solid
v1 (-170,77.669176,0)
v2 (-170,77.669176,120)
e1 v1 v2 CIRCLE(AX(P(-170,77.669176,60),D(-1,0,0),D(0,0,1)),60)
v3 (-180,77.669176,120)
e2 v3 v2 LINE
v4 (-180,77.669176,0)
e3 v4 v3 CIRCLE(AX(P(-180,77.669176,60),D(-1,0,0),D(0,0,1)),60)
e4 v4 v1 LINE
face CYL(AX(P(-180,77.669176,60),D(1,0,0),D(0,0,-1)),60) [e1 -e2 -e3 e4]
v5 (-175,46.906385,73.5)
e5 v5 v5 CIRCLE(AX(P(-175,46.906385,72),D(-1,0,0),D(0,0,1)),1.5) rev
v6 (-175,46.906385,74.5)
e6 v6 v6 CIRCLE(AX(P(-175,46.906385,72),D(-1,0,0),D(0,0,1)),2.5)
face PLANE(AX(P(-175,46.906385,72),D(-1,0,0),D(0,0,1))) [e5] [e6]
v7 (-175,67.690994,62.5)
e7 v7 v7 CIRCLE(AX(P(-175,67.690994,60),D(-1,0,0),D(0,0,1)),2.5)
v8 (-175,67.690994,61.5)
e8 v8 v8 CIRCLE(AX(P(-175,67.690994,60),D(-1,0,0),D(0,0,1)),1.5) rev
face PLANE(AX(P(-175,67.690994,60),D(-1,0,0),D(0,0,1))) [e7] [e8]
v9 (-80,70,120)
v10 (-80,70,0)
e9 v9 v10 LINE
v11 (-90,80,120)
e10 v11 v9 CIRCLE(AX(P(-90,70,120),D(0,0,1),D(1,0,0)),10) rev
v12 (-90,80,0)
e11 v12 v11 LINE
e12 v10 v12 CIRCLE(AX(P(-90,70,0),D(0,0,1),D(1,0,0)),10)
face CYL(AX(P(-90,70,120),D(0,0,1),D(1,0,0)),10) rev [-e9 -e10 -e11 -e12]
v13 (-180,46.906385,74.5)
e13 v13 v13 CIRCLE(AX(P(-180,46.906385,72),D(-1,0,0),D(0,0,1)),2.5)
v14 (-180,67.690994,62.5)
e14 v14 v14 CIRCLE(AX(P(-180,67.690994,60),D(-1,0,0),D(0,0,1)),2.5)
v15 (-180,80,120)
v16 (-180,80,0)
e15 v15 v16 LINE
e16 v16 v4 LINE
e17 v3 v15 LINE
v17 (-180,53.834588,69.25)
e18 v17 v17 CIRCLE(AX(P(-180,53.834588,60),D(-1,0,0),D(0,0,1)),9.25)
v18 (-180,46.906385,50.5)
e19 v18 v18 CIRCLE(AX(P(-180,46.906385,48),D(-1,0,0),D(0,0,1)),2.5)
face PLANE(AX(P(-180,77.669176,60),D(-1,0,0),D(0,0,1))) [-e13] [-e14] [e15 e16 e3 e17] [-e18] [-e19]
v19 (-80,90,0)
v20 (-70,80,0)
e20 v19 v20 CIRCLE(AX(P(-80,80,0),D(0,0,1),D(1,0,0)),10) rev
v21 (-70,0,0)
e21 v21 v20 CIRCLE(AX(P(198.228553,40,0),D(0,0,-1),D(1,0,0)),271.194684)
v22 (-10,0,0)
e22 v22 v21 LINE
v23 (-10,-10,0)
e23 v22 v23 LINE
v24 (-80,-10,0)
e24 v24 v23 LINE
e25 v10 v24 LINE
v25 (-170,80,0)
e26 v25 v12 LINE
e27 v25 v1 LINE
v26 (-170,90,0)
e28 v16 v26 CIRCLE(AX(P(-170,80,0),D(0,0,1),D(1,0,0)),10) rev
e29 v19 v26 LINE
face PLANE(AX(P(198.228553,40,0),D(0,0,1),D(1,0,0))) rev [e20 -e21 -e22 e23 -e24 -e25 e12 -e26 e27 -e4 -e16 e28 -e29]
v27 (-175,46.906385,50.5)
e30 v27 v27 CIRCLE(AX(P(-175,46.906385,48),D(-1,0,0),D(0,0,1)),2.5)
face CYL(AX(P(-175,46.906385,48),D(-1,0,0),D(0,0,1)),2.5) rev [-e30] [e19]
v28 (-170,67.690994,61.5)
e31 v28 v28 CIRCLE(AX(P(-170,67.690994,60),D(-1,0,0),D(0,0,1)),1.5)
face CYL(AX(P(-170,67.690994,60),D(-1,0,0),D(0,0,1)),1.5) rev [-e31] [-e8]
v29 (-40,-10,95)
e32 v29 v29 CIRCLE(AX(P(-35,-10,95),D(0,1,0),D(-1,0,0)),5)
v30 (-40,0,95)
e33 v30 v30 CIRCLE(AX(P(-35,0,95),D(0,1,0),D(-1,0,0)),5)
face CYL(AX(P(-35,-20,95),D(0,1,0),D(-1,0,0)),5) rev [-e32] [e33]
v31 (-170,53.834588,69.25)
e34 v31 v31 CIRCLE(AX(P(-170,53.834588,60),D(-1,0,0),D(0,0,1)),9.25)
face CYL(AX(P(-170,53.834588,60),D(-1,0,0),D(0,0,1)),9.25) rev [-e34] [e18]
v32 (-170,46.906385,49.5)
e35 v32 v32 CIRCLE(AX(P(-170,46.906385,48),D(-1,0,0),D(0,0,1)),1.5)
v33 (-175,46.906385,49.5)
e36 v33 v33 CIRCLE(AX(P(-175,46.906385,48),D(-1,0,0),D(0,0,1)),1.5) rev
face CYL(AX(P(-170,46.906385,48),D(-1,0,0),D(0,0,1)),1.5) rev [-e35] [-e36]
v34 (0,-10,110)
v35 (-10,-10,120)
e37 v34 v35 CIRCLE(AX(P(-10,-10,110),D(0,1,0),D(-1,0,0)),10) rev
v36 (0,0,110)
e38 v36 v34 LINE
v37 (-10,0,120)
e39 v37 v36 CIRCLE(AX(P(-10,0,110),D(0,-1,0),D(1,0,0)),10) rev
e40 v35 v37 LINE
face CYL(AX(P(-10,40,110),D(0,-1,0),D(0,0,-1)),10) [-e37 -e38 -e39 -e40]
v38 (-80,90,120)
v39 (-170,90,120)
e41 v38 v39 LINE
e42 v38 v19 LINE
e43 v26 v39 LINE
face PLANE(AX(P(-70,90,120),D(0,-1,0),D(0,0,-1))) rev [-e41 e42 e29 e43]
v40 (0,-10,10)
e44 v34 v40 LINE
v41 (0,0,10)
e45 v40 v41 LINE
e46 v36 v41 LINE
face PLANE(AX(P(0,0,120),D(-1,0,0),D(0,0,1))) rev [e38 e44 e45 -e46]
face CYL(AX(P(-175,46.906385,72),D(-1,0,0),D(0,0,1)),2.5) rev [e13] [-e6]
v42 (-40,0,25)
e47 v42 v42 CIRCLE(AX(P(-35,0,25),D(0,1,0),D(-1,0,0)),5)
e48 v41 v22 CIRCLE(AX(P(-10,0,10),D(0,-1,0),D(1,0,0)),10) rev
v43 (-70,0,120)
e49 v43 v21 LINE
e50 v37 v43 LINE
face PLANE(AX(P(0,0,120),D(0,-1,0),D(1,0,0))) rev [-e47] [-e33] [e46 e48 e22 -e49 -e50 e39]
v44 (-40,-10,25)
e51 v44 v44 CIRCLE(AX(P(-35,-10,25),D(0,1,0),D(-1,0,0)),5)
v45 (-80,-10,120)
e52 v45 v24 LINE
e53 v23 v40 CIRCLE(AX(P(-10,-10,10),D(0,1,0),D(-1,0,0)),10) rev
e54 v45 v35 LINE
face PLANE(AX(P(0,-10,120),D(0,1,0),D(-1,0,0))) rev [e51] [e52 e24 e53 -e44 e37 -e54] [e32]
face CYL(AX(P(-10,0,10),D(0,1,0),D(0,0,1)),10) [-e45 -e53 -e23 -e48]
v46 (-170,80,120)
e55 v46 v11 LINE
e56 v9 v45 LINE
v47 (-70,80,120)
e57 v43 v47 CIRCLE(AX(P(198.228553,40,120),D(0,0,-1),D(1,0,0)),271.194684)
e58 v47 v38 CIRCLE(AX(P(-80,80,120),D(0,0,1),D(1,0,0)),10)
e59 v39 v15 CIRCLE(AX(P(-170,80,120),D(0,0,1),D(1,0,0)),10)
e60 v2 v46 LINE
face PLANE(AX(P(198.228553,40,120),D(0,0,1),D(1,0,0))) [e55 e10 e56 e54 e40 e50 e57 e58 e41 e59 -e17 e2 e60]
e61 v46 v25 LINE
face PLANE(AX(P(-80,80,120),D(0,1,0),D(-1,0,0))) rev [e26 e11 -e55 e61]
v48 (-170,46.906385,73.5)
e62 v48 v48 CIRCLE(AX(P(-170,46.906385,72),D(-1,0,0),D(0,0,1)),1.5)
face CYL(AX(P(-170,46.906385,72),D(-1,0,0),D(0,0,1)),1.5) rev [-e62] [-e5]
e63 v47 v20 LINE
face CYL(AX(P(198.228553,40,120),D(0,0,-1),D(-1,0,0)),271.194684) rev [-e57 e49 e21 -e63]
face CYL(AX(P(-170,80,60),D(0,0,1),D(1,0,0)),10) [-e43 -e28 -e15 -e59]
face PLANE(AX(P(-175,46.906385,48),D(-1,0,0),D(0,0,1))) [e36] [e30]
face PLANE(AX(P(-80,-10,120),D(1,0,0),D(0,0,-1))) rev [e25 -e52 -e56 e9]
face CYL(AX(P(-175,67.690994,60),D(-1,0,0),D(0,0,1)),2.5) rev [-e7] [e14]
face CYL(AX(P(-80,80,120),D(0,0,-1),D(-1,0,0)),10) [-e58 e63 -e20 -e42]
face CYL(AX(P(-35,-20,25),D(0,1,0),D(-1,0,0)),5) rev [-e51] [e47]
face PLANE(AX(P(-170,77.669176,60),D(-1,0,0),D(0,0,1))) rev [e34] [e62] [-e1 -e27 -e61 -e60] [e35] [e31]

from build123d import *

# Parameters (mm, degrees)
BOSS_EXTRUDE1_DEPTH = 120
BOSS_EXTRUDE2_DEPTH = 10
SKETCH3_R           = 9.25
SKETCH3_R_2         = 1.5
CUT_EXTRUDE1_DEPTH  = 10
FILLET1_R           = 10
SKETCH4_R           = 5
CUT_EXTRUDE2_DEPTH  = 20
FILLET2_R           = 10
FILLET4_R           = 10
FILLET6_R           = 10
SKETCH5_R           = 2.5
CUT_EXTRUDE3_DEPTH  = 5


with BuildPart() as part:
    # Sketch1 → Boss-Extrude1 (new body)
    with BuildSketch(Plane.XY):
        with BuildLine():
            Line((0, 0), (-70, 0))
            ThreePointArc((-70, 0), (-72.966131028, 40), (-70, 80))
            Line((-70, 80), (-70, 90))
            Line((-70, 90), (-170, 90))
            Line((-170, 90), (-170, 80))
            Line((-170, 80), (-80, 80))
            Line((-80, 80), (-80, -10))
            Line((-80, -10), (0, -10))
            Line((0, -10), (0, 0))
        make_face()
    extrude(amount=BOSS_EXTRUDE1_DEPTH)

    # Sketch2 → Boss-Extrude2 (add)
    with BuildSketch(Plane.ZY.offset(170)):
        with BuildLine():
            Line((0, 80), (0, 77.669175799))
            ThreePointArc((0, 77.669175799), (60, 17.669175799), (120, 77.669175799))
            Line((120, 77.669175799), (120, 90))
            Line((120, 90), (0, 90))
            Line((0, 90), (0, 80))
        make_face()
    extrude(amount=BOSS_EXTRUDE2_DEPTH)

    # Sketch3 → Cut-Extrude1 (cut)
    with BuildSketch(Plane.ZY.offset(180)):
        with Locations((60, 53.8345879)):
            Circle(SKETCH3_R)
        with Locations((48, 46.906384669)):
            Circle(SKETCH3_R_2)
        with Locations((60, 67.69099436)):
            Circle(SKETCH3_R_2)
        with Locations((72, 46.906384669)):
            Circle(SKETCH3_R_2)
    extrude(amount=-CUT_EXTRUDE1_DEPTH, mode=Mode.SUBTRACT)

    # Fillet1
    fillet1_edges = [part.edges().sort_by_distance(p)[0] for p in [
        (0, -5, 0),
        (0, -5, 120),
    ]]
    fillet(fillet1_edges, radius=FILLET1_R)

    # Sketch4 → Cut-Extrude2 (cut)
    with BuildSketch(Plane(origin=(0, 0, 0), x_dir=(1, 0, 0), z_dir=(0, 1, 0))):
        with Locations(Location((-35, -25, 0), (0, 0, 180))):
            Circle(SKETCH4_R)
        with Locations(Location((-35, -95, 0), (0, 0, 180))):
            Circle(SKETCH4_R)
    extrude(amount=-CUT_EXTRUDE2_DEPTH, mode=Mode.SUBTRACT)

    # Fillet2
    fillet2_edges = [part.edges().sort_by_distance(p)[0] for p in [
        (-70, 90, 60),
    ]]
    fillet(fillet2_edges, radius=FILLET2_R - 0.0001)  # a hair under: the kernel refuses the full size

    # Fillet4
    fillet4_edges = [part.edges().sort_by_distance(p)[0] for p in [
        (-80, 80, 60),
    ]]
    fillet(fillet4_edges, radius=FILLET4_R)

    # Fillet6
    fillet6_edges = [part.edges().sort_by_distance(p)[0] for p in [
        (-180, 90, 60),
    ]]
    fillet(fillet6_edges, radius=FILLET6_R)

    # Sketch5 → Cut-Extrude3 (cut)
    with BuildSketch(Plane.ZY.offset(180)):
        with Locations((72, 46.906384669)):
            Circle(SKETCH5_R)
        with Locations((60, 67.69099436)):
            Circle(SKETCH5_R)
        with Locations((48, 46.906384669)):
            Circle(SKETCH5_R)
    extrude(amount=-CUT_EXTRUDE3_DEPTH, mode=Mode.SUBTRACT)


solid = part.part
